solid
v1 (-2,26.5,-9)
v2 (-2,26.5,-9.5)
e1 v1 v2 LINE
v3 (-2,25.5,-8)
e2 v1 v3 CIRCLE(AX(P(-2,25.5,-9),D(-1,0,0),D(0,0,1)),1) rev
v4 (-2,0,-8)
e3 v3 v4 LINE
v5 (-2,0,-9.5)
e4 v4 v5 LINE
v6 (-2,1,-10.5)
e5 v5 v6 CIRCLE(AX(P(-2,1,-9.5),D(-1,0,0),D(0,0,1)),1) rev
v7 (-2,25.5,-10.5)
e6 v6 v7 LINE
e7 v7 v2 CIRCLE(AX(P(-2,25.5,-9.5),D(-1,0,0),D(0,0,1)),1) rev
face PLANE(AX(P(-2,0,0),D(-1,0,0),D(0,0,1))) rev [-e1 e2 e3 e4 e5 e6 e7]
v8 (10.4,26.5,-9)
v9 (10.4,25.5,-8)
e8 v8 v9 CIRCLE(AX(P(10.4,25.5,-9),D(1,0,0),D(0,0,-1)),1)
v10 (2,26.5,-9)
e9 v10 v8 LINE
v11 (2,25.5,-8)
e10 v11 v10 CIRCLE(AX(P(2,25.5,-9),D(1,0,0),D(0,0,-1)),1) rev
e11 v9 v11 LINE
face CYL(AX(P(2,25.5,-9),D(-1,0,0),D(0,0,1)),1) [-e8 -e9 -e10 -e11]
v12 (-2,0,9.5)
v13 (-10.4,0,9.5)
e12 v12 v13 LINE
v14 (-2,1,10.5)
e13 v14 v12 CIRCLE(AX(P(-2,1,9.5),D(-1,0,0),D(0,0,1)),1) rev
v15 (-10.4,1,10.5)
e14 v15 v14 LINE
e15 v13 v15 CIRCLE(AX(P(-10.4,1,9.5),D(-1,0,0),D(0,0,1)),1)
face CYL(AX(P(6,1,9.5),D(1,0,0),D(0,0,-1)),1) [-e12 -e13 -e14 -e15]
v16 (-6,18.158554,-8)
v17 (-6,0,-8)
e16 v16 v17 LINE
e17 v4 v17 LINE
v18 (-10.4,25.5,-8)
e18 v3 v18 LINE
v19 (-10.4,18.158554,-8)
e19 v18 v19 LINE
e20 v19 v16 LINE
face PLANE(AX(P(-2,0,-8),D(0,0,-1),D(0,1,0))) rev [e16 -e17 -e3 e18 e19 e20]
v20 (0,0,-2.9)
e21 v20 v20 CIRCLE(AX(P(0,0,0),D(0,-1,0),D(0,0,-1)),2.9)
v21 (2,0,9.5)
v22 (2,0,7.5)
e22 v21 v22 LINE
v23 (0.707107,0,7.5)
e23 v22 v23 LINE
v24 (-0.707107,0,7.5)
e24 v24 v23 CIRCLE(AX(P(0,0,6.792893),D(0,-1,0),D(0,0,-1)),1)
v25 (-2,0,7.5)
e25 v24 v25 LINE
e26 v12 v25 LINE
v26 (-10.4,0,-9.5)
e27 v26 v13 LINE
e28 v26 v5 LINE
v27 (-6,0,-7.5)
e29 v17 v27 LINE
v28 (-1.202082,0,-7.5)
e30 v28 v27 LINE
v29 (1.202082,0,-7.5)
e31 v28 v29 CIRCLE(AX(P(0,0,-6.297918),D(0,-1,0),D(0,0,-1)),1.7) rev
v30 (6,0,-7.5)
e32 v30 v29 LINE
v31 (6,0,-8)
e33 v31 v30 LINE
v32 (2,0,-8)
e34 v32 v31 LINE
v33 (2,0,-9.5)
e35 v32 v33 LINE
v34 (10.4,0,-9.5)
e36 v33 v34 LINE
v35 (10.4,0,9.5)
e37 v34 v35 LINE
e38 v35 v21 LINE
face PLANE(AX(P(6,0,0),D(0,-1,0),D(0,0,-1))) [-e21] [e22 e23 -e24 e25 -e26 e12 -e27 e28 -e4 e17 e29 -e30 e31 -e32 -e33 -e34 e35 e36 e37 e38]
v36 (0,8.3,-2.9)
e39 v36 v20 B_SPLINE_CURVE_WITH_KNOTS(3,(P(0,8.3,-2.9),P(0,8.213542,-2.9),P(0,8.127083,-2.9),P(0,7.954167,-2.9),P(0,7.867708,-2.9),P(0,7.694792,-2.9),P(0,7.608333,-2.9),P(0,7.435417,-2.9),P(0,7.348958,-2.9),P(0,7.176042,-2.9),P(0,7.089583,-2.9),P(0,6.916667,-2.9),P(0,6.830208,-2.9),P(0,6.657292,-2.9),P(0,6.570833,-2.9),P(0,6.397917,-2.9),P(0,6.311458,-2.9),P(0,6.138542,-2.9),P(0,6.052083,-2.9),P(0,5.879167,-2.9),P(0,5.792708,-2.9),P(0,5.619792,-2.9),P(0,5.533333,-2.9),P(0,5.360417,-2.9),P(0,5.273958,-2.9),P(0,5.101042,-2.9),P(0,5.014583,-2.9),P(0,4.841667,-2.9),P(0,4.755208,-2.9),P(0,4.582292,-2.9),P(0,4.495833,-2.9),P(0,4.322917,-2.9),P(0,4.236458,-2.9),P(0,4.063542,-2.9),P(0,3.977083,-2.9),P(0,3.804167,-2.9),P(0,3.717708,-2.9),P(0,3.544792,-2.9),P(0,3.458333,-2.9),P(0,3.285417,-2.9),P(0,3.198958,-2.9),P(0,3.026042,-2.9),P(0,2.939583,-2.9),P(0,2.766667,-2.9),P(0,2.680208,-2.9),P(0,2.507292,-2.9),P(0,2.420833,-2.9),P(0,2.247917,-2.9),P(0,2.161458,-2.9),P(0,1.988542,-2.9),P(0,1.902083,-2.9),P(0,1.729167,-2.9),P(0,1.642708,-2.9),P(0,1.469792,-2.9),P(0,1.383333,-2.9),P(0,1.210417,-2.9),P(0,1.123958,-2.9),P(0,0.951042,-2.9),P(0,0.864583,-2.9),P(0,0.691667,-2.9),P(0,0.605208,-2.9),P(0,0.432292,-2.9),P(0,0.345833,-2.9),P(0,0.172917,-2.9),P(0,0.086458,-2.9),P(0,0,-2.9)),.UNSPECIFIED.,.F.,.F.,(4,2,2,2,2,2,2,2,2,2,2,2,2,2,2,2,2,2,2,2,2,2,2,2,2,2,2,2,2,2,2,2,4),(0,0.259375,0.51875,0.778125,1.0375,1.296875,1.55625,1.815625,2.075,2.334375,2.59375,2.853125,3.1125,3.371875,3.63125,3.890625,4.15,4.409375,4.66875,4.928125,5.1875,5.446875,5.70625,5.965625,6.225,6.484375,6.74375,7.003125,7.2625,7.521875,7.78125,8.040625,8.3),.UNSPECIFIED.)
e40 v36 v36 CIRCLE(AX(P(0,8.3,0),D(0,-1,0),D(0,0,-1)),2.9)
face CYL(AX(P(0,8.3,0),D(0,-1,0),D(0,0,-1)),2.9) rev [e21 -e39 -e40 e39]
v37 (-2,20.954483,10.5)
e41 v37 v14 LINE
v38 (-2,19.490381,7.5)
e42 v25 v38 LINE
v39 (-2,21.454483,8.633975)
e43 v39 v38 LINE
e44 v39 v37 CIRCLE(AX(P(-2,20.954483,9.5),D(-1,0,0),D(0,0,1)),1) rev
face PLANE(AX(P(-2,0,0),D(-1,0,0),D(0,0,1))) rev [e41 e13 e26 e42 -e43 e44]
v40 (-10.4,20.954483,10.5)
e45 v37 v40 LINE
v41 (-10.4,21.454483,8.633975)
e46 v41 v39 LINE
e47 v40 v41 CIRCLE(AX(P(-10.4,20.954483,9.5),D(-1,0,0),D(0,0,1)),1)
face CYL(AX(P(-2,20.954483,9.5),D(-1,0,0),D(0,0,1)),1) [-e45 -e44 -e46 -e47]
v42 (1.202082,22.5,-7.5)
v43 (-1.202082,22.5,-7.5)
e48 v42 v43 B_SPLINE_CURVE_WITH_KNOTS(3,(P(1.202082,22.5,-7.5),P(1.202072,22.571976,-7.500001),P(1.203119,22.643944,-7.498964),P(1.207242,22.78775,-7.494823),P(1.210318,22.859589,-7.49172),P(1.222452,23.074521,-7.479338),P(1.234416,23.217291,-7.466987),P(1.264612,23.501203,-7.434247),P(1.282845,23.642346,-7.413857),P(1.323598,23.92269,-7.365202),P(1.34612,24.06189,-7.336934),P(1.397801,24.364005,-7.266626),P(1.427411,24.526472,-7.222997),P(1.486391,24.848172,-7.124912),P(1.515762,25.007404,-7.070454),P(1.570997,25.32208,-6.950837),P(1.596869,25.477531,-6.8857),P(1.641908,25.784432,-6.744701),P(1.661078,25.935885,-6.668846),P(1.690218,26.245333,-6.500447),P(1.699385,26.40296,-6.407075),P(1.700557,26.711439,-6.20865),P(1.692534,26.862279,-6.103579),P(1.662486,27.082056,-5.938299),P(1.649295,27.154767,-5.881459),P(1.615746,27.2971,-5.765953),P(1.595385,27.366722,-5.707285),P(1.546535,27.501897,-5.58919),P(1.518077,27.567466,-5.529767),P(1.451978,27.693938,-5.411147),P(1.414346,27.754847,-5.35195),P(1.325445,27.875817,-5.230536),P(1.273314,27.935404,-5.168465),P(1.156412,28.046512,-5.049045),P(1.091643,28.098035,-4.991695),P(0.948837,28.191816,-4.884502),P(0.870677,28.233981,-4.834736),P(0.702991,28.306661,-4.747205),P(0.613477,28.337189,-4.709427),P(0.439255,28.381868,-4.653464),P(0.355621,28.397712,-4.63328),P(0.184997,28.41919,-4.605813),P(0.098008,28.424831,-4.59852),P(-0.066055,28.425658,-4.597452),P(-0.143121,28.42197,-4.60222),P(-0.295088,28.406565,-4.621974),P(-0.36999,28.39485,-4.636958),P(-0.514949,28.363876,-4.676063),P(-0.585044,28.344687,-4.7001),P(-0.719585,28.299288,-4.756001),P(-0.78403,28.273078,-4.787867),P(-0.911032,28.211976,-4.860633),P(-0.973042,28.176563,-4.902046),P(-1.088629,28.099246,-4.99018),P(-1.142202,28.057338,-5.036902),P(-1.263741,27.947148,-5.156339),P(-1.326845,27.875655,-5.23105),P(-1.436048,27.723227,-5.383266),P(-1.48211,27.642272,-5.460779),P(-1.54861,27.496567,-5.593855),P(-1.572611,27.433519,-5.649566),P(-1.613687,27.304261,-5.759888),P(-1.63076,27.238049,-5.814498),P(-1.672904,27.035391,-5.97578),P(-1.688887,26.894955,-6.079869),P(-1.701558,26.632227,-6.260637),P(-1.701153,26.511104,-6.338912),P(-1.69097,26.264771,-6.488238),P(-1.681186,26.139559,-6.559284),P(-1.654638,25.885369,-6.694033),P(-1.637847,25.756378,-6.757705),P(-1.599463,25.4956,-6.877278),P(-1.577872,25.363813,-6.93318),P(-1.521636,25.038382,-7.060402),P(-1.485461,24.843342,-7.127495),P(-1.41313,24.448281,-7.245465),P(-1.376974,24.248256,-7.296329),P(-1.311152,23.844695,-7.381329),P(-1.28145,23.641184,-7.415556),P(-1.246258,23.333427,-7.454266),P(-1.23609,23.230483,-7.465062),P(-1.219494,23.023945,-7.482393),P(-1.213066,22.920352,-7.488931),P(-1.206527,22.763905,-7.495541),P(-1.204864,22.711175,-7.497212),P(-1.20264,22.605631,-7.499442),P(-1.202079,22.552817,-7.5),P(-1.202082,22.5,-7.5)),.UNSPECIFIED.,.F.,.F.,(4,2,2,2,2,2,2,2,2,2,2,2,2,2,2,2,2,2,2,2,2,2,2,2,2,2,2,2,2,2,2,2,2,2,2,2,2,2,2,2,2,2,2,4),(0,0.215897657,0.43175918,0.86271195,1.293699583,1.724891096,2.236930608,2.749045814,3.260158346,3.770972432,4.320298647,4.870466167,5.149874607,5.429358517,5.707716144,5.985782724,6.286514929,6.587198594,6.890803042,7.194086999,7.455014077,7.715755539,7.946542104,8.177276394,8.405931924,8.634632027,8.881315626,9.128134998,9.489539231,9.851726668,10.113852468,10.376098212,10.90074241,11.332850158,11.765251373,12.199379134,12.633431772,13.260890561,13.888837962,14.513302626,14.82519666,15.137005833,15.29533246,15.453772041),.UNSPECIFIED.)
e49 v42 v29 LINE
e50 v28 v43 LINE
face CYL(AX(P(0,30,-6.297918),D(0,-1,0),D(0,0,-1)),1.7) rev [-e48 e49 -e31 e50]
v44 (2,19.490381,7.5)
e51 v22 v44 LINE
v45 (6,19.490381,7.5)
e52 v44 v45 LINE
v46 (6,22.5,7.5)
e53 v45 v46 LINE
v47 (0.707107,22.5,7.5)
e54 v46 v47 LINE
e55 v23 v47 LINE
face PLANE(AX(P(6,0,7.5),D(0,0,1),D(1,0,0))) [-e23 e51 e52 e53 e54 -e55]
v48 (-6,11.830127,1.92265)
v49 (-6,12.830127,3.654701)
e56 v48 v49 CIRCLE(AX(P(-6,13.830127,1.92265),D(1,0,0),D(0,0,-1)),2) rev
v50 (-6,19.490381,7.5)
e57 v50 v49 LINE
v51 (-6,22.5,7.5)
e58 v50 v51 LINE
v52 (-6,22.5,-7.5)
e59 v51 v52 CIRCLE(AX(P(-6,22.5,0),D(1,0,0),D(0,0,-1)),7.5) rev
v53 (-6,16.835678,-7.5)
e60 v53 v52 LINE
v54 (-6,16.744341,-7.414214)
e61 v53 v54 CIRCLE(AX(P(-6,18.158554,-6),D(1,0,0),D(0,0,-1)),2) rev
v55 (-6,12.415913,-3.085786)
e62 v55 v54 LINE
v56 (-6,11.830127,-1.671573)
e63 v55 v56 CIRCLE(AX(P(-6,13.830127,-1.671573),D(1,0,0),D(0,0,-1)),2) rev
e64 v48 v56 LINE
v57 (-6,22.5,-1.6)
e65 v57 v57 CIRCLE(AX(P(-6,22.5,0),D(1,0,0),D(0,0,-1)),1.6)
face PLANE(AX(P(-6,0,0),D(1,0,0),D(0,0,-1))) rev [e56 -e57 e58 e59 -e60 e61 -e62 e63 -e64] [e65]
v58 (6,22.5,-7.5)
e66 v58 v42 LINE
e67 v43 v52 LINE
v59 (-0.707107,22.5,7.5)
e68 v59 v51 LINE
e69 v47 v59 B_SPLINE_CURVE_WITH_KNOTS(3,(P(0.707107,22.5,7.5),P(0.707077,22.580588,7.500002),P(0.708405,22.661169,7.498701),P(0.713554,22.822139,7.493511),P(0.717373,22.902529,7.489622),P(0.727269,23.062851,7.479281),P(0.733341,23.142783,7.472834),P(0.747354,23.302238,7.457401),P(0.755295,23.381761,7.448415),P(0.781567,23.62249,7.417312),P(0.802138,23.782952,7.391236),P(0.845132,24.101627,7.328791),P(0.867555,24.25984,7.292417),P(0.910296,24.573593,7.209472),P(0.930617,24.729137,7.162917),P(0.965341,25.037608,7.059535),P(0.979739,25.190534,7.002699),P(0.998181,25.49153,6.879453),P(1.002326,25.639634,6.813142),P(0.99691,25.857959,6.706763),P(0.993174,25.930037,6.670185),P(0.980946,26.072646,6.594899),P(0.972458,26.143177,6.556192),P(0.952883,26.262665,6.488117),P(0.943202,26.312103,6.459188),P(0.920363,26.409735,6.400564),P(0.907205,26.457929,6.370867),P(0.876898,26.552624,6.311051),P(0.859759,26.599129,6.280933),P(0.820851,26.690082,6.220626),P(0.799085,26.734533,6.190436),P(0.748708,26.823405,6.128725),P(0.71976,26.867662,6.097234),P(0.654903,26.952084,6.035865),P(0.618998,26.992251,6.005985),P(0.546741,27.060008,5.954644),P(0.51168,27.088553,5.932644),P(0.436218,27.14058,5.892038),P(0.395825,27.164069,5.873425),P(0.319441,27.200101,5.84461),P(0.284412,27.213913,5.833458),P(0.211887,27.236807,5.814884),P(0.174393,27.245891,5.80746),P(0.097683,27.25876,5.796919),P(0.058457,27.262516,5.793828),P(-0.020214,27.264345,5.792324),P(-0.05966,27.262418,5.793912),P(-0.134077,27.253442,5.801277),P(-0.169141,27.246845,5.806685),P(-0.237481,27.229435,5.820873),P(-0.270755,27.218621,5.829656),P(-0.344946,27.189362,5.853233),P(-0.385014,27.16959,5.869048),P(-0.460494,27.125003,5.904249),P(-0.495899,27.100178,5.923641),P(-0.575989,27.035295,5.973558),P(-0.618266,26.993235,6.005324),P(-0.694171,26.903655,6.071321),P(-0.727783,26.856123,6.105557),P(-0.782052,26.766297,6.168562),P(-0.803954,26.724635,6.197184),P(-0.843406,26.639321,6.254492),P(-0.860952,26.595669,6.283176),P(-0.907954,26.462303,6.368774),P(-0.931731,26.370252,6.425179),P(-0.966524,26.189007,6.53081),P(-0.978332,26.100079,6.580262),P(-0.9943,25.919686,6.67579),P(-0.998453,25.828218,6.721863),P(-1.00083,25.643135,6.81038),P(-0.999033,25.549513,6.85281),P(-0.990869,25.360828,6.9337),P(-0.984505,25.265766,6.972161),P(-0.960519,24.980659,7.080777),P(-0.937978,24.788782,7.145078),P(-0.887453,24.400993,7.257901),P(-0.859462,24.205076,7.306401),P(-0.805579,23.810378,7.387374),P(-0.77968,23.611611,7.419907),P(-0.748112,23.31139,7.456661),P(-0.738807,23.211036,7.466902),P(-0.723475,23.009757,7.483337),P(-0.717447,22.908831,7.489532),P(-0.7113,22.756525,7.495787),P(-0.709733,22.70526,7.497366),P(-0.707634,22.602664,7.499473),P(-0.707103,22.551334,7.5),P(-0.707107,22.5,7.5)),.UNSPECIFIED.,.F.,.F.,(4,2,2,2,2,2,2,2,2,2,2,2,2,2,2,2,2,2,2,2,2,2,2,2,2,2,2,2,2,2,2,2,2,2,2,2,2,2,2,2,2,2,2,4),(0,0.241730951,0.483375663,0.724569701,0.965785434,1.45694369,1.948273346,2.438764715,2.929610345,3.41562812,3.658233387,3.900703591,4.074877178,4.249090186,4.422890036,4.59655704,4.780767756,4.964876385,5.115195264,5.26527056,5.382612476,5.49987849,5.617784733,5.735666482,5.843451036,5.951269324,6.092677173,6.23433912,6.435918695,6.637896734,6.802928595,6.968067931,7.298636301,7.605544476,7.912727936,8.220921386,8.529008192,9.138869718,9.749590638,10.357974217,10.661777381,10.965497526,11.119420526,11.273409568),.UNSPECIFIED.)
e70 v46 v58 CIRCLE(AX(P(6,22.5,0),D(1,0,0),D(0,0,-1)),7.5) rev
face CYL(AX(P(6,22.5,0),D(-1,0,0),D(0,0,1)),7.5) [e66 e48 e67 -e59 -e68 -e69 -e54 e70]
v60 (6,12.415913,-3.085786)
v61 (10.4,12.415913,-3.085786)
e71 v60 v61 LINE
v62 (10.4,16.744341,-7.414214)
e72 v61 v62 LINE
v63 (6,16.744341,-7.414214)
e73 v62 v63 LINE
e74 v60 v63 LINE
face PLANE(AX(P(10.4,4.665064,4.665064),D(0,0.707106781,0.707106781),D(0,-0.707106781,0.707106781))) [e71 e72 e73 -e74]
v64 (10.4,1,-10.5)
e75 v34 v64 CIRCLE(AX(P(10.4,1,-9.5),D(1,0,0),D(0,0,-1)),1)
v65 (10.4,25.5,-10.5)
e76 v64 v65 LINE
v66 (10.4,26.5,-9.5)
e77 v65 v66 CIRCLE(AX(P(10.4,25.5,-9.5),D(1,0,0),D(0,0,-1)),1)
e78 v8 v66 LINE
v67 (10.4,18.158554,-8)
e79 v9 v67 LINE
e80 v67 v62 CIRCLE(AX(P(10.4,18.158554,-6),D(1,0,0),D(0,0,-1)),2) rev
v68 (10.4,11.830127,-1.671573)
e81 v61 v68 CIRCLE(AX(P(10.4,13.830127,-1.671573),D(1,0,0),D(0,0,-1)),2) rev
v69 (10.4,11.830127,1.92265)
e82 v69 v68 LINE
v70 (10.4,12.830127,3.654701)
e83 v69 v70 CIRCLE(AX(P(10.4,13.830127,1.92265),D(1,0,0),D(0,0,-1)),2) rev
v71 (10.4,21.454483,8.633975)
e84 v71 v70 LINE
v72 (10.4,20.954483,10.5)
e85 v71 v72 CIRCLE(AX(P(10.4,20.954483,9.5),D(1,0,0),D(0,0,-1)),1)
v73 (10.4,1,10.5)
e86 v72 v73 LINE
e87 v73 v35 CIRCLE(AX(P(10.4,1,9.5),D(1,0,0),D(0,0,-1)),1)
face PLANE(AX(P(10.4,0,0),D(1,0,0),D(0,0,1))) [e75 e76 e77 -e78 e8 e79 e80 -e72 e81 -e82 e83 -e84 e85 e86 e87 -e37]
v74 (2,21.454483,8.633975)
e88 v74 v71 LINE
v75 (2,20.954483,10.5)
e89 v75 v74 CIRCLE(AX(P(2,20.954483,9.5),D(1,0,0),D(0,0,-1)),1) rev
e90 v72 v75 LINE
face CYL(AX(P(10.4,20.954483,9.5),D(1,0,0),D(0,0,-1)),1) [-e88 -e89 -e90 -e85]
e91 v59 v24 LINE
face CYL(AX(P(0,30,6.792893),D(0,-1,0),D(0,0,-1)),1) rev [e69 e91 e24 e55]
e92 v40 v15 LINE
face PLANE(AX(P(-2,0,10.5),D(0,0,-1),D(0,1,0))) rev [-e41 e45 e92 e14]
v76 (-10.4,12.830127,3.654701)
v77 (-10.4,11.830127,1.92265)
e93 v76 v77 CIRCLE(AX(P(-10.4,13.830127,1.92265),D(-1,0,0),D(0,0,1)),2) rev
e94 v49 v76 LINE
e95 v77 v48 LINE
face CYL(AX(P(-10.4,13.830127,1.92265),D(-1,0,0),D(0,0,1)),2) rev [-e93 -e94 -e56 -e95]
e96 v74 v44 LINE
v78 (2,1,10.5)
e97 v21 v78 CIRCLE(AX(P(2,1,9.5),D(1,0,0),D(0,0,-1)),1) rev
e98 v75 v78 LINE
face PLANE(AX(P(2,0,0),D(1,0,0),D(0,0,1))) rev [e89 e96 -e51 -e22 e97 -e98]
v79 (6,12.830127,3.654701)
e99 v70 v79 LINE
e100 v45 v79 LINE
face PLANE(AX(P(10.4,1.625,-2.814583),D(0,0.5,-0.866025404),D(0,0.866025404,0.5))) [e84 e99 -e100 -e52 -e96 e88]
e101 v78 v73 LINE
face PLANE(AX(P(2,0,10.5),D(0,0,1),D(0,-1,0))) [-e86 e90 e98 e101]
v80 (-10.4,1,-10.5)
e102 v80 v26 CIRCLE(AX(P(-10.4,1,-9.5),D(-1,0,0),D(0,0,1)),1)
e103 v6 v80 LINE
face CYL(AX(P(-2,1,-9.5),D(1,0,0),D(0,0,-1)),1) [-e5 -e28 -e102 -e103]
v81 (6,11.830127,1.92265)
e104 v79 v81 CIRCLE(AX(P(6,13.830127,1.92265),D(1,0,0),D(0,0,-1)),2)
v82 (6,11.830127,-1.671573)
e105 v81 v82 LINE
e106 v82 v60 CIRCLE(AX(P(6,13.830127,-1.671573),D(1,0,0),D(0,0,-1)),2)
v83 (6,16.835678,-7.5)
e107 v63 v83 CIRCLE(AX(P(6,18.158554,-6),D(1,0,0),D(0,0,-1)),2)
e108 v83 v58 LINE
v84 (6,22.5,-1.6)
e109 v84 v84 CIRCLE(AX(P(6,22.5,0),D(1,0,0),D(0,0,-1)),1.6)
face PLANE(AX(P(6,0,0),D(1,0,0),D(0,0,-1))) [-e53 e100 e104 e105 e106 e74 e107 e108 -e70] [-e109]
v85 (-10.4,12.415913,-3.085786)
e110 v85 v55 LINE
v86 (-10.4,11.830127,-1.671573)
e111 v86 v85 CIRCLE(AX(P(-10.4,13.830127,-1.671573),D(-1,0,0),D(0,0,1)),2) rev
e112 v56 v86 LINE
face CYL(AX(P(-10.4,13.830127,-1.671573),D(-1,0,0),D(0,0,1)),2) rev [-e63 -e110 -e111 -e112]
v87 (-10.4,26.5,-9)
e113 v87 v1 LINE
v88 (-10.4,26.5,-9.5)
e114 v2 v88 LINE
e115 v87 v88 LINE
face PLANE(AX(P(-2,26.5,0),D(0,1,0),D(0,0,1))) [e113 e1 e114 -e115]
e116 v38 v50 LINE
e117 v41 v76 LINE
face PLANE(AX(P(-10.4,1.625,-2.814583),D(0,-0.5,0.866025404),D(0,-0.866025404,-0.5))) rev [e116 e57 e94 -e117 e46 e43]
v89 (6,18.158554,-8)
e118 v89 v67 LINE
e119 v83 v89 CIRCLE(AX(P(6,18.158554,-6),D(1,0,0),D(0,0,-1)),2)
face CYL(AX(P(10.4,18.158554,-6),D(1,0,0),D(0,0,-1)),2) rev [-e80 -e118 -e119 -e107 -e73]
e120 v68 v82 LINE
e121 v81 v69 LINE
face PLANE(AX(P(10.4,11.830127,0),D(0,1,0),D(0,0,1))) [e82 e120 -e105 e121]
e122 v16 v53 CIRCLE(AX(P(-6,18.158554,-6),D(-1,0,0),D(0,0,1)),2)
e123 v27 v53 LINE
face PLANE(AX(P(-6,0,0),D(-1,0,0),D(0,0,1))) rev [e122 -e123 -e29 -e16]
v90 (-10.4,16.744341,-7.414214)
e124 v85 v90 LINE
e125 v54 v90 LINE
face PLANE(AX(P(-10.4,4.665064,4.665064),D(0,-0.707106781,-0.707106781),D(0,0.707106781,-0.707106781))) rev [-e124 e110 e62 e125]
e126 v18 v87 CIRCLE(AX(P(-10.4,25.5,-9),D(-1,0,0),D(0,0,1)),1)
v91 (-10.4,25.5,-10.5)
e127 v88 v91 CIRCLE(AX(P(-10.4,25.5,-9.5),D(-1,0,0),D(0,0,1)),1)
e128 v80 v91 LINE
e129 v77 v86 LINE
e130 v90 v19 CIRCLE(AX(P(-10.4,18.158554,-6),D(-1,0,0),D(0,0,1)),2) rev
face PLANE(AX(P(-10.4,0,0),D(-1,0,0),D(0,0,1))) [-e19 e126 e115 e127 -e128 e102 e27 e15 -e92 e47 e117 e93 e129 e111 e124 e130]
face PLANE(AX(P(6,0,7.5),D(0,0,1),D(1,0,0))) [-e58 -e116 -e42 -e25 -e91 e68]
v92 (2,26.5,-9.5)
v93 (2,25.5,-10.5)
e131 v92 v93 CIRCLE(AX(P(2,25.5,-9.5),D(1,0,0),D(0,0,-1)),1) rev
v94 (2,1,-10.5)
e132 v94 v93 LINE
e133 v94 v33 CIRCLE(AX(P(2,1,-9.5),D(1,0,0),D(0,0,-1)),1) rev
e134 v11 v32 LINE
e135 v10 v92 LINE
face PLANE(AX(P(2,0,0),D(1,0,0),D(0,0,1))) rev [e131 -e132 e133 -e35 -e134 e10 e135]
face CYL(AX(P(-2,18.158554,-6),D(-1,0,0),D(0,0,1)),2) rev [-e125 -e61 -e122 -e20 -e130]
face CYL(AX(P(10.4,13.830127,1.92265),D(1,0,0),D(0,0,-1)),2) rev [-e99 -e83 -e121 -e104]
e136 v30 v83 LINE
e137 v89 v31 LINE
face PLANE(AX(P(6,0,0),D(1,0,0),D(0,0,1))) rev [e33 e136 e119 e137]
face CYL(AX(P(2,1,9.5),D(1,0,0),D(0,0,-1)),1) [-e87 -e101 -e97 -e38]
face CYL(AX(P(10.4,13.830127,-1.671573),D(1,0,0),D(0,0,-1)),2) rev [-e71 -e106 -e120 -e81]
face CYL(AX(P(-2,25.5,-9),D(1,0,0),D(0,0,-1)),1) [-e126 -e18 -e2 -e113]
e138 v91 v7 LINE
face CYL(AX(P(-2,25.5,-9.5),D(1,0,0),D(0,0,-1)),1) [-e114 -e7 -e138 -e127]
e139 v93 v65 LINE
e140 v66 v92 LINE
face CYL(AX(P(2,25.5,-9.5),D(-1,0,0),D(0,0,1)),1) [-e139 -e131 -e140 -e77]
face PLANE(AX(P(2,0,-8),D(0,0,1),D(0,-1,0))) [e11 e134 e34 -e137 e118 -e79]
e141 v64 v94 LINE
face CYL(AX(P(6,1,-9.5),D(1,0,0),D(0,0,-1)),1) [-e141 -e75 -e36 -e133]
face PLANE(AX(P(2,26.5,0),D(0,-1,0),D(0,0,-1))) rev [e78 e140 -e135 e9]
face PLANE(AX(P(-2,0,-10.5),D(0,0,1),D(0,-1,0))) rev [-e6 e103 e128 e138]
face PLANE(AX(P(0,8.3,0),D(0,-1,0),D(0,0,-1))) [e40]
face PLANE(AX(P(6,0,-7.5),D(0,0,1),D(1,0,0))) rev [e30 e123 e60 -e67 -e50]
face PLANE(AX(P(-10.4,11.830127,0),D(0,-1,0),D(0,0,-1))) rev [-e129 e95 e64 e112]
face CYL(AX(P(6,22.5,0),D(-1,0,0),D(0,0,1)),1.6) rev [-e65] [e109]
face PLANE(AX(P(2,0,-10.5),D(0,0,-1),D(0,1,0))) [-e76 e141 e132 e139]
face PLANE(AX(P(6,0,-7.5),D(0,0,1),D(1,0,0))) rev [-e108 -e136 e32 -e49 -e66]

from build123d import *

# Parameters (mm, degrees)
SKETCH1_R                    = 1.6
BASE_DEPTH                   = 6
PTFE_CLAMP_3MM_OD_DEPTH      = 32.5
PTFE_CLAMP_1_6MM_OD_DEPTH    = 32.500000138
SKETCH3_R                    = 2.9
RUTHEX_M3_INSERT_HOLE_DEPTH  = 8.3
SIDE_PROFILE_DEPTH           = 4.4
ANGLE_CONSTRAINT_BACK_START  = -4
ANGLE_CONSTRAINT_BACK_DEPTH  = 8.4
ANGLE_CONSTRAINT_FRONT_START = -4
ANGLE_CONSTRAINT_FRONT_DEPTH = 8.4
FILLET4_R                    = 1
FILLET5_R                    = 2
FILLET4_OF_MIRROR4_R         = 1
FILLET5_OF_MIRROR4_R         = 2


with BuildPart() as part:
    # Sketch1 → base (new, symmetric)
    with BuildSketch(Plane(origin=(0, 0, 0), x_dir=(0, 0, -1), z_dir=(1, 0, 0))):
        with BuildLine():
            Line((7.5, 0), (-7.5, 0))
            Line((-7.5, 0), (-7.5, 22.5))
            ThreePointArc((-7.5, 22.5), (0, 30), (7.5, 22.5))
            Line((7.5, 22.5), (7.5, 0))
        make_face()
        with Locations((0, 22.5)):
            Circle(SKETCH1_R, mode=Mode.SUBTRACT)
    extrude(amount=BASE_DEPTH, both=True)

    # Sketch2 → PTFE_clamp_3mm_OD (cut, through all)
    with BuildSketch(Plane.XZ):
        with BuildLine():
            Line((0, -7.5), (1.202081528, -7.5))
            ThreePointArc((1.202081528, -7.5), (1.570595205, -5.647356637), (0, -4.597918472))
            Line((0, -4.597918472), (0, -7.5))
        make_face()
        with BuildLine():
            Line((-1.202081528, -7.5), (0, -7.5))
            Line((0, -7.5), (0, -4.597918472))
            ThreePointArc((0, -4.597918472), (-1.570595205, -5.647356637), (-1.202081528, -7.5))
        make_face()
        with BuildLine():
            Line((0, -7.5), (1.202081528, -7.5))
            ThreePointArc((1.202081528, -7.5), (1.570595205, -5.647356637), (0, -4.597918472))
            Line((0, -4.597918472), (0, -7.5))
        make_face()
        with BuildLine():
            Line((-1.202081528, -7.5), (0, -7.5))
            Line((0, -7.5), (0, -4.597918472))
            ThreePointArc((0, -4.597918472), (-1.570595205, -5.647356637), (-1.202081528, -7.5))
        make_face()
    extrude(amount=-PTFE_CLAMP_3MM_OD_DEPTH, mode=Mode.SUBTRACT)

    # Sketch2<3> → PTFE_clamp_1.6mm_OD (cut, through all)
    with BuildSketch(Plane.XZ):
        with BuildLine():
            ThreePointArc((-0.707106781, 7.5), (-0.923879533, 6.410209786), (0, 5.792893219))
            Line((0, 5.792893219), (0, 7.5))
            Line((0, 7.5), (-0.707106781, 7.5))
        make_face()
        with BuildLine():
            Line((0, 7.5), (0, 5.792893219))
            ThreePointArc((0, 5.792893219), (0.923879533, 6.410209786), (0.707106781, 7.5))
            Line((0.707106781, 7.5), (0, 7.5))
        make_face()
        with BuildLine():
            ThreePointArc((-0.707106781, 7.5), (-0.923879533, 6.410209786), (0, 5.792893219))
            Line((0, 5.792893219), (0, 7.5))
            Line((0, 7.5), (-0.707106781, 7.5))
        make_face()
        with BuildLine():
            Line((0, 7.5), (0, 5.792893219))
            ThreePointArc((0, 5.792893219), (0.923879533, 6.410209786), (0.707106781, 7.5))
            Line((0.707106781, 7.5), (0, 7.5))
        make_face()
    extrude(amount=-PTFE_CLAMP_1_6MM_OD_DEPTH, mode=Mode.SUBTRACT)

    # Sketch3 → ruthex_m3_insert_hole (cut)
    with BuildSketch(Plane.XZ):
        with Locations(Location((0, 0, 0), (0, 0, 270))):
            Circle(SKETCH3_R)
    extrude(amount=-RUTHEX_M3_INSERT_HOLE_DEPTH, mode=Mode.SUBTRACT)

    # Sketch4 → side_profile (add)
    with BuildSketch(Plane.ZY.offset(6)):
        Polygon((-8, 0), (7.5, 0), (7.5, 19.490381057), (3.077350269, 11.830127019), (-2.5, 11.830127019), (-8, 17.330127019), align=None)
    side_profile = extrude(amount=SIDE_PROFILE_DEPTH)

    # Sketch4<4> → angle_constraint_back (add)
    with BuildSketch(Plane.ZY.offset(6).offset(ANGLE_CONSTRAINT_BACK_START)):
        Polygon((-10.5, 0), (-8, 0), (-8, 17.330127019), (-8, 26.5), (-10.5, 26.5), align=None)
    angle_constraint_back = extrude(amount=ANGLE_CONSTRAINT_BACK_DEPTH)

    # Sketch4<6> → angle_constraint_front (add)
    with BuildSketch(Plane.ZY.offset(6).offset(ANGLE_CONSTRAINT_FRONT_START)):
        Polygon((7.5, 19.490381057), (7.5, 0), (10.5, 0), (10.5, 24.686533479), align=None)
    angle_constraint_front = extrude(amount=ANGLE_CONSTRAINT_FRONT_DEPTH)

    # Fillet4
    fillet4_edges = [part.edges().sort_by_distance(p)[0] for p in [
        (-6.2, 26.5, -8),
        (-6.2, 0, -10.5),
        (-6.2, 26.5, -10.5),
        (-6.2, 24.686533479, 10.5),
        (-6.2, 0, 10.5),
    ]]
    fillet(fillet4_edges, radius=FILLET4_R)

    # Fillet5
    # the kernel refuses this fillet: 2 mm, written as the material it adds along each edge
    with BuildSketch(Plane(origin=(-3.113248654, 11.830127019, 3.077350269), x_dir=(0, 0.8660254037844377, 0.5000000000000013), z_dir=(-1, 0, 0))) as fillet5_piece_1:
        with BuildLine():
            CenterArc((FILLET5_R * 0.57735026919, FILLET5_R), FILLET5_R, 210, 60)
            Line((-FILLET5_R * 0.288675134595, FILLET5_R * 0.5), (0, 0))
            Line((0, 0), (FILLET5_R * 0.57735026919, 0))
        make_face()
    extrude(amount=7.286751346)
    with BuildSketch(Plane(origin=(-3.928932188, 11.830127019, -2.5), x_dir=(0, 0.7071067811865489, -0.7071067811865462), z_dir=(-1, 0, 0))) as fillet5_piece_2:
        with BuildLine():
            CenterArc((FILLET5_R * 0.414213562373, -FILLET5_R), FILLET5_R, 90, 45)
            Line((-FILLET5_R * 0.292893218813, -FILLET5_R * 0.292893218813), (0, 0))
            Line((0, 0), (FILLET5_R * 0.414213562373, 0))
        make_face()
    extrude(amount=6.471067812)
    with BuildSketch(Plane(origin=(-6, 17.330127019, -8), x_dir=(0, 1, 0), z_dir=(-1, 0, 0))) as fillet5_piece_3:
        with BuildLine():
            CenterArc((FILLET5_R * 0.414213562373, -FILLET5_R), FILLET5_R, 90, 45)
            Line((-FILLET5_R * 0.292893218813, -FILLET5_R * 0.292893218813), (0, 0))
            Line((0, 0), (FILLET5_R * 0.414213562373, 0))
        make_face()
    extrude(amount=4.4)

    # Mirror4: side_profile, angle_constraint_back, angle_constraint_front across plane
    add(side_profile.mirror(Plane(origin=(0, 0, 0), x_dir=(0, 0, 1), z_dir=(1, 0, 0))))
    add(angle_constraint_back.mirror(Plane(origin=(0, 0, 0), x_dir=(0, 0, 1), z_dir=(1, 0, 0))))
    add(angle_constraint_front.mirror(Plane(origin=(0, 0, 0), x_dir=(0, 0, 1), z_dir=(1, 0, 0))))

    # Fillet4 of Mirror4
    fillet4_of_mirror4_edges = [part.edges().sort_by_distance(p)[0] for p in [
        (6.2, 26.5, -8),
        (6.2, 0, -10.5),
        (6.2, 26.5, -10.5),
        (6.2, 24.686533479, 10.5),
        (6.2, 0, 10.5),
    ]]
    fillet(fillet4_of_mirror4_edges, radius=FILLET4_OF_MIRROR4_R)

    # Fillet5 of Mirror4
    # the kernel refuses this fillet: 2 mm, written as the material it adds along each edge
    with BuildSketch(Plane(origin=(3.113248654, 11.830127019, 3.077350269), x_dir=(0, 0.8660254037844386, 0.5000000000000002), z_dir=(1, 0, 0))) as fillet5_of_mirror4_piece_1:
        with BuildLine():
            CenterArc((FILLET5_OF_MIRROR4_R * 0.57735026919, -FILLET5_OF_MIRROR4_R), FILLET5_OF_MIRROR4_R, 90, 60)
            Line((-FILLET5_OF_MIRROR4_R * 0.288675134595, -FILLET5_OF_MIRROR4_R * 0.5), (0, 0))
            Line((0, 0), (FILLET5_OF_MIRROR4_R * 0.57735026919, 0))
        make_face()
    extrude(amount=7.286751346)
    with BuildSketch(Plane(origin=(3.928932188, 11.830127019, -2.5), x_dir=(0, 0, 1), z_dir=(1, 0, 0))) as fillet5_of_mirror4_piece_2:
        with BuildLine():
            CenterArc((FILLET5_OF_MIRROR4_R * 0.414213562373, -FILLET5_OF_MIRROR4_R), FILLET5_OF_MIRROR4_R, 90, 45)
            Line((-FILLET5_OF_MIRROR4_R * 0.292893218813, -FILLET5_OF_MIRROR4_R * 0.292893218813), (0, 0))
            Line((0, 0), (FILLET5_OF_MIRROR4_R * 0.414213562373, 0))
        make_face()
    extrude(amount=6.471067812)
    with BuildSketch(Plane(origin=(6, 17.330127019, -8), x_dir=(0, 1, 0), z_dir=(1, 0, 0))) as fillet5_of_mirror4_piece_3:
        with BuildLine():
            CenterArc((FILLET5_OF_MIRROR4_R * 0.414213562373, FILLET5_OF_MIRROR4_R), FILLET5_OF_MIRROR4_R, 225, 45)
            Line((-FILLET5_OF_MIRROR4_R * 0.292893218813, FILLET5_OF_MIRROR4_R * 0.292893218813), (0, 0))
            Line((0, 0), (FILLET5_OF_MIRROR4_R * 0.414213562373, 0))
        make_face()
    extrude(amount=4.4)


solid = part.part
